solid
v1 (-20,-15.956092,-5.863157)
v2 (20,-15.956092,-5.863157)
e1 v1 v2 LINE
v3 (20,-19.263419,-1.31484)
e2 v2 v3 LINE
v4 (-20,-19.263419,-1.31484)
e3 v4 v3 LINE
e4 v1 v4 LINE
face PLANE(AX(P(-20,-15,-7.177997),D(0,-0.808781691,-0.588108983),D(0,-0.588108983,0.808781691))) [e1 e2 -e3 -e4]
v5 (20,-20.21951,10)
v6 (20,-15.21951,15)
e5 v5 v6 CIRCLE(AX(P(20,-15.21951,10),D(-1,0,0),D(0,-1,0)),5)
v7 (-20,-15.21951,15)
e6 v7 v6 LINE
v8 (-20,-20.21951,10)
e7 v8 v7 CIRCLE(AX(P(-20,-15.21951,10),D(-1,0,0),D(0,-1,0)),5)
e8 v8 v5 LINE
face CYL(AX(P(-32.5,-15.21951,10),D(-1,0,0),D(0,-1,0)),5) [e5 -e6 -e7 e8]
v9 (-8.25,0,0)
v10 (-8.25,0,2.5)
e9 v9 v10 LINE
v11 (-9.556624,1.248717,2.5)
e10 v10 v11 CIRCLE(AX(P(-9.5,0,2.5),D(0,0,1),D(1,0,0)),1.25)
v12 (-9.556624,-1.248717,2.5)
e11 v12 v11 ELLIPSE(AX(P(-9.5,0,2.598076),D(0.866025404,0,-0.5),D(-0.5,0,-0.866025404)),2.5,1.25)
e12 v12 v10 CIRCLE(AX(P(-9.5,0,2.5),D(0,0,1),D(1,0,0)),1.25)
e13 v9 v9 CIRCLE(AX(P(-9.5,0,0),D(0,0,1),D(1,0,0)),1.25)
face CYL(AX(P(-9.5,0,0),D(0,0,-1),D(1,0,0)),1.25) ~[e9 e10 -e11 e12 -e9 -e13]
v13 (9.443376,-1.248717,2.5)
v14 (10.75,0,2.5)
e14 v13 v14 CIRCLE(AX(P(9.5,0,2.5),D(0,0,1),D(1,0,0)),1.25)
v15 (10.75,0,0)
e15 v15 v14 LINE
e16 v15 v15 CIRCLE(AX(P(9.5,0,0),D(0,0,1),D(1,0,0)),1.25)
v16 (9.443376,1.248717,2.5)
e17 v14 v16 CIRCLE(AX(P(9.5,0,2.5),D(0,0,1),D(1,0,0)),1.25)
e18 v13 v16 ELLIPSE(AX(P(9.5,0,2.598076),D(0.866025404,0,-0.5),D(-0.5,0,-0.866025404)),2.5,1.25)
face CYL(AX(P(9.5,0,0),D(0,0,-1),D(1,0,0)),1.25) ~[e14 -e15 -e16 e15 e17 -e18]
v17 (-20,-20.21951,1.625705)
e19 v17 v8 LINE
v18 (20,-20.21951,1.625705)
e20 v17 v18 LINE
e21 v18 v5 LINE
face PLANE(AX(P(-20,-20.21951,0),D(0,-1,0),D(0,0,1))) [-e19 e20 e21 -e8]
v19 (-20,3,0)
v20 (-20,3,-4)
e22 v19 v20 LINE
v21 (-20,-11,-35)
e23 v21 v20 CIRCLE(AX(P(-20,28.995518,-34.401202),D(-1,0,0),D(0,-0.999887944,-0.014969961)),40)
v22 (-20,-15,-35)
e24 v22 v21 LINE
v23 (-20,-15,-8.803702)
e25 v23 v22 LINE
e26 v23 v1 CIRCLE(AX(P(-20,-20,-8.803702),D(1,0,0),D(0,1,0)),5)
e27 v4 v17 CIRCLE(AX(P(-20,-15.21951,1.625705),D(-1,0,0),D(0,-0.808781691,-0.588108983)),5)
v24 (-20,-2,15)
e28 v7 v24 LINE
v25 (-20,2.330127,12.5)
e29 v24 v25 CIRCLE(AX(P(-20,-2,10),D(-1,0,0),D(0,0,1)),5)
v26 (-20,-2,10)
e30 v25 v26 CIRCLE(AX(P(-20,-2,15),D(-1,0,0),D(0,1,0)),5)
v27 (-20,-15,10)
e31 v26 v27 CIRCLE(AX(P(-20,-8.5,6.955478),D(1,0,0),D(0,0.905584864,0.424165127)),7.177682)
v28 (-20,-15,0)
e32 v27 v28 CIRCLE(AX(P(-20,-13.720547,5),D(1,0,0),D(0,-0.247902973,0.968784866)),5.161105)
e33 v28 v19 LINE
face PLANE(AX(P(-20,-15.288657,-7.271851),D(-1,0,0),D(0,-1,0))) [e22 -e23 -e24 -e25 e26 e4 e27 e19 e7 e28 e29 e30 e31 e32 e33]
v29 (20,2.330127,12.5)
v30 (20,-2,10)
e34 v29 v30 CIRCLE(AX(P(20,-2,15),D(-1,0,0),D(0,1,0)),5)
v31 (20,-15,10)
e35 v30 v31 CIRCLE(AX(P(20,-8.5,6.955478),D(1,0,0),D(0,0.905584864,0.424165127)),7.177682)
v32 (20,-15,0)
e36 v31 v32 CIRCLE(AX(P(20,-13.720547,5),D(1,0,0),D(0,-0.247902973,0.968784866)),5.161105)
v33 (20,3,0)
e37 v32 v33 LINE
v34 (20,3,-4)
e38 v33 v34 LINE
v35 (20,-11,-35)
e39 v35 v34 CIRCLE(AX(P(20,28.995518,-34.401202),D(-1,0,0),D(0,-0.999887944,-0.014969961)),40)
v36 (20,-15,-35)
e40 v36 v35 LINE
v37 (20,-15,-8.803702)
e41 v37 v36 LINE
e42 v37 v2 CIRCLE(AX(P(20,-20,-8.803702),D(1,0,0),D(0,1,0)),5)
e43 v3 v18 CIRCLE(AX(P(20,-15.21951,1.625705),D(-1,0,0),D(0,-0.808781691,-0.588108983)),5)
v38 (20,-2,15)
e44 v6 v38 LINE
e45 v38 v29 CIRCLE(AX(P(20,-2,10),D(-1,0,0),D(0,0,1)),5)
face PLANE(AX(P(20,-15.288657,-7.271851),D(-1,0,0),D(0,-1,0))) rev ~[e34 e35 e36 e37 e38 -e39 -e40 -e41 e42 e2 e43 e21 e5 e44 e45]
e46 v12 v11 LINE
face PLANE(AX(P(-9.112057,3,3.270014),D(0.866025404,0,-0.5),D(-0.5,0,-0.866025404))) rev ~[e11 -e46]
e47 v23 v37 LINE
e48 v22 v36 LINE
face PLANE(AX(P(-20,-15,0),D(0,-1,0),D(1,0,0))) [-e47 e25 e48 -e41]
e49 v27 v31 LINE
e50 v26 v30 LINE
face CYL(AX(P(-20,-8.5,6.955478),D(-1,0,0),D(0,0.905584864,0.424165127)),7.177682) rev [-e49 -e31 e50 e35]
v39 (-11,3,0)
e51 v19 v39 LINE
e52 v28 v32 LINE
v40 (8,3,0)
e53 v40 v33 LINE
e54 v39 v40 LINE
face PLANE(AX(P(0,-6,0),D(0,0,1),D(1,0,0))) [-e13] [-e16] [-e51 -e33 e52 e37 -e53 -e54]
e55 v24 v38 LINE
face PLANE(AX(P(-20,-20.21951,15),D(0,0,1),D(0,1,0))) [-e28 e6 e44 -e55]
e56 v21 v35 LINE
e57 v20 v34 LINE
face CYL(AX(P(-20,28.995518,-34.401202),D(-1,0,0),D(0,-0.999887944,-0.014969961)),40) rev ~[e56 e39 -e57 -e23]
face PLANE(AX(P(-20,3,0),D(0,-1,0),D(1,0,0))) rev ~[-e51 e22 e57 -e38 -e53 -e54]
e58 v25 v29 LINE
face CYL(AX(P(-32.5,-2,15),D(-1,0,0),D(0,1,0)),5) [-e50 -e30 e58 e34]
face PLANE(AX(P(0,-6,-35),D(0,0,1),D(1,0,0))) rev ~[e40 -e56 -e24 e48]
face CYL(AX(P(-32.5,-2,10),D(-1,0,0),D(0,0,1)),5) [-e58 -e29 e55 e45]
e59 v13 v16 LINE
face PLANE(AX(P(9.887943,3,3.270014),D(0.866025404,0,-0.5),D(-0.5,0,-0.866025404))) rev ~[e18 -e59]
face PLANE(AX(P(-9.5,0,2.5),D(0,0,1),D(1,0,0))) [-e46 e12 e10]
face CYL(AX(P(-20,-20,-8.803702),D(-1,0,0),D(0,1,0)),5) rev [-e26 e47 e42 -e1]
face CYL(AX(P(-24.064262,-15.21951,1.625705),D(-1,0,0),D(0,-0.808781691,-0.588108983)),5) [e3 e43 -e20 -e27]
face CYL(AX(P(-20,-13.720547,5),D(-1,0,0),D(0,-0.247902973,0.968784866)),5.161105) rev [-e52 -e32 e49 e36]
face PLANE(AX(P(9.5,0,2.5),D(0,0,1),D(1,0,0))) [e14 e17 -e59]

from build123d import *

# Parameters (mm, degrees)
F0_R         = 1.25
F1_DEPTH     = 2.5
F2_W         = 40
F2_H         = 18
F3_DEPTH     = 35
F5_DEPTH     = 40.001
F7_DEPTH     = 40
F9_DEPTH     = 10
F10_T1_DEPTH = 40
F10_T3_DEPTH = 65
F10_T5_DEPTH = 48.1285235511


# Not quite as in the source:
# - a fillet or chamfer that OpenCascade refuses, or shapes differently, is made with other operations: its cross-section is extruded or revolved along the edge and cut away or added


with BuildPart() as f1:
    # F0 (on Top) → F1 (new body)
    with BuildSketch(Plane.XY):
        with Locations((-9.5, 0)):
            Circle(F0_R)
    extrude(amount=F1_DEPTH)



with BuildPart() as f1b:
    # F0 (on Top) → F1, piece 2 (new body)
    with BuildSketch(Plane.XY):
        with Locations((9.5, 0)):
            Circle(F0_R)
    extrude(amount=F1_DEPTH)


with BuildPart() as f1_1:
    add(f1.part)

    add(f1b.part)  # F3 merges F1b
    # F2 (on Top) → F3 (join)
    with BuildSketch(Plane.XY):
        with Locations((0, -6)):
            Rectangle(F2_W, F2_H)
    extrude(amount=-F3_DEPTH)

    # F4 (on face) → F5 (cut, through all)
    with BuildSketch(Plane(origin=(-20, 0, 0), x_dir=(0, -1, 0), z_dir=(-1, 0, 0))):
        with BuildLine():
            Line((-3, -35), (11, -35))
            ThreePointArc((11, -35), (7.459306232, -17.9377326694), (-3, -4))
            Line((-3, -4), (-3, -35))
        make_face()
    extrude(amount=-F5_DEPTH, mode=Mode.SUBTRACT)

    # F6 (on face) → F7 (join)
    with BuildSketch(Plane(origin=(-20, 0, 0), x_dir=(0, -1, 0), z_dir=(-1, 0, 0))):
        with BuildLine():
            Line((-3, 10), (2, 10))
            ThreePointArc((2, 10), (8.5, 14.1331594945), (15, 10))
            ThreePointArc((15, 10), (18.881651405, 5), (15, 0))
            Line((15, 0), (15, -7.1779969148))
            Line((15, -7.1779969148), (20.2195104212, 0))
            Line((20.2195104212, 0), (20.2195104212, 15))
            Line((20.2195104212, 15), (-3, 15))
            Line((-3, 15), (-3, 10))
        make_face()
    extrude(amount=-F7_DEPTH)

    # F8 (on face) → F9 (cut)
    with BuildSketch(Plane(origin=(0, 3, 0), x_dir=(-1, 0, 0), z_dir=(0, 1, 0))):
        Polygon((9.1120566488, 3.2700138061), (11, 0), (11, 3.2700138061), align=None)
        Polygon((-9.8879433512, 3.2700138061), (-8, 0), (-8, 3.2700138061), align=None)
    extrude(amount=-F9_DEPTH, mode=Mode.SUBTRACT)

    # F10: fillet of radius 5 on 5 edges, made by hand

    # F10_s2 → F10_t1 (join)
    with BuildSketch(Plane.YZ.offset(-20)):
        with BuildLine():
            ThreePointArc((-15, -8.803701625), (-15.245026694, -7.257665125), (-15.9560915438, -5.8631567099))
            Line((-15.9560915438, -5.8631567099), (-15, -7.1779969148))
            Line((-15, -7.1779969148), (-15, -8.803701625))
        make_face()
    extrude(amount=F10_T1_DEPTH)

    # F10_s4 → F10_t3 (cut)
    with BuildSketch(Plane.YZ.offset(-32.5)):
        with BuildLine():
            ThreePointArc((-20.2195104212, 10), (-18.7550443271, 13.5355339059), (-15.2195104212, 15))
            Line((-15.2195104212, 15), (-20.2195104212, 15))
            Line((-20.2195104212, 15), (-20.2195104212, 10))
        make_face()
        with BuildLine():
            ThreePointArc((-2, 15), (1.5355339059, 13.5355339059), (3, 10))
            Line((3, 10), (3, 15))
            Line((3, 15), (-2, 15))
        make_face()
        with BuildLine():
            ThreePointArc((3, 15), (1.5355339059, 11.4644660941), (-2, 10))
            Line((-2, 10), (3, 10))
            Line((3, 10), (3, 15))
        make_face()
    extrude(amount=F10_T3_DEPTH, mode=Mode.SUBTRACT)

    # F10_s6 → F10_t5 (cut)
    with BuildSketch(Plane.YZ.offset(-24.0642617755)):
        with BuildLine():
            ThreePointArc((-19.2634188773, -1.314840205), (-19.9744837271, 0.0796682101), (-20.2195104212, 1.6257047102))
            Line((-20.2195104212, 1.6257047102), (-20.2195104212, 0))
            Line((-20.2195104212, 0), (-19.2634188773, -1.314840205))
        make_face()
    extrude(amount=F10_T5_DEPTH, mode=Mode.SUBTRACT)


solid = f1_1.part
